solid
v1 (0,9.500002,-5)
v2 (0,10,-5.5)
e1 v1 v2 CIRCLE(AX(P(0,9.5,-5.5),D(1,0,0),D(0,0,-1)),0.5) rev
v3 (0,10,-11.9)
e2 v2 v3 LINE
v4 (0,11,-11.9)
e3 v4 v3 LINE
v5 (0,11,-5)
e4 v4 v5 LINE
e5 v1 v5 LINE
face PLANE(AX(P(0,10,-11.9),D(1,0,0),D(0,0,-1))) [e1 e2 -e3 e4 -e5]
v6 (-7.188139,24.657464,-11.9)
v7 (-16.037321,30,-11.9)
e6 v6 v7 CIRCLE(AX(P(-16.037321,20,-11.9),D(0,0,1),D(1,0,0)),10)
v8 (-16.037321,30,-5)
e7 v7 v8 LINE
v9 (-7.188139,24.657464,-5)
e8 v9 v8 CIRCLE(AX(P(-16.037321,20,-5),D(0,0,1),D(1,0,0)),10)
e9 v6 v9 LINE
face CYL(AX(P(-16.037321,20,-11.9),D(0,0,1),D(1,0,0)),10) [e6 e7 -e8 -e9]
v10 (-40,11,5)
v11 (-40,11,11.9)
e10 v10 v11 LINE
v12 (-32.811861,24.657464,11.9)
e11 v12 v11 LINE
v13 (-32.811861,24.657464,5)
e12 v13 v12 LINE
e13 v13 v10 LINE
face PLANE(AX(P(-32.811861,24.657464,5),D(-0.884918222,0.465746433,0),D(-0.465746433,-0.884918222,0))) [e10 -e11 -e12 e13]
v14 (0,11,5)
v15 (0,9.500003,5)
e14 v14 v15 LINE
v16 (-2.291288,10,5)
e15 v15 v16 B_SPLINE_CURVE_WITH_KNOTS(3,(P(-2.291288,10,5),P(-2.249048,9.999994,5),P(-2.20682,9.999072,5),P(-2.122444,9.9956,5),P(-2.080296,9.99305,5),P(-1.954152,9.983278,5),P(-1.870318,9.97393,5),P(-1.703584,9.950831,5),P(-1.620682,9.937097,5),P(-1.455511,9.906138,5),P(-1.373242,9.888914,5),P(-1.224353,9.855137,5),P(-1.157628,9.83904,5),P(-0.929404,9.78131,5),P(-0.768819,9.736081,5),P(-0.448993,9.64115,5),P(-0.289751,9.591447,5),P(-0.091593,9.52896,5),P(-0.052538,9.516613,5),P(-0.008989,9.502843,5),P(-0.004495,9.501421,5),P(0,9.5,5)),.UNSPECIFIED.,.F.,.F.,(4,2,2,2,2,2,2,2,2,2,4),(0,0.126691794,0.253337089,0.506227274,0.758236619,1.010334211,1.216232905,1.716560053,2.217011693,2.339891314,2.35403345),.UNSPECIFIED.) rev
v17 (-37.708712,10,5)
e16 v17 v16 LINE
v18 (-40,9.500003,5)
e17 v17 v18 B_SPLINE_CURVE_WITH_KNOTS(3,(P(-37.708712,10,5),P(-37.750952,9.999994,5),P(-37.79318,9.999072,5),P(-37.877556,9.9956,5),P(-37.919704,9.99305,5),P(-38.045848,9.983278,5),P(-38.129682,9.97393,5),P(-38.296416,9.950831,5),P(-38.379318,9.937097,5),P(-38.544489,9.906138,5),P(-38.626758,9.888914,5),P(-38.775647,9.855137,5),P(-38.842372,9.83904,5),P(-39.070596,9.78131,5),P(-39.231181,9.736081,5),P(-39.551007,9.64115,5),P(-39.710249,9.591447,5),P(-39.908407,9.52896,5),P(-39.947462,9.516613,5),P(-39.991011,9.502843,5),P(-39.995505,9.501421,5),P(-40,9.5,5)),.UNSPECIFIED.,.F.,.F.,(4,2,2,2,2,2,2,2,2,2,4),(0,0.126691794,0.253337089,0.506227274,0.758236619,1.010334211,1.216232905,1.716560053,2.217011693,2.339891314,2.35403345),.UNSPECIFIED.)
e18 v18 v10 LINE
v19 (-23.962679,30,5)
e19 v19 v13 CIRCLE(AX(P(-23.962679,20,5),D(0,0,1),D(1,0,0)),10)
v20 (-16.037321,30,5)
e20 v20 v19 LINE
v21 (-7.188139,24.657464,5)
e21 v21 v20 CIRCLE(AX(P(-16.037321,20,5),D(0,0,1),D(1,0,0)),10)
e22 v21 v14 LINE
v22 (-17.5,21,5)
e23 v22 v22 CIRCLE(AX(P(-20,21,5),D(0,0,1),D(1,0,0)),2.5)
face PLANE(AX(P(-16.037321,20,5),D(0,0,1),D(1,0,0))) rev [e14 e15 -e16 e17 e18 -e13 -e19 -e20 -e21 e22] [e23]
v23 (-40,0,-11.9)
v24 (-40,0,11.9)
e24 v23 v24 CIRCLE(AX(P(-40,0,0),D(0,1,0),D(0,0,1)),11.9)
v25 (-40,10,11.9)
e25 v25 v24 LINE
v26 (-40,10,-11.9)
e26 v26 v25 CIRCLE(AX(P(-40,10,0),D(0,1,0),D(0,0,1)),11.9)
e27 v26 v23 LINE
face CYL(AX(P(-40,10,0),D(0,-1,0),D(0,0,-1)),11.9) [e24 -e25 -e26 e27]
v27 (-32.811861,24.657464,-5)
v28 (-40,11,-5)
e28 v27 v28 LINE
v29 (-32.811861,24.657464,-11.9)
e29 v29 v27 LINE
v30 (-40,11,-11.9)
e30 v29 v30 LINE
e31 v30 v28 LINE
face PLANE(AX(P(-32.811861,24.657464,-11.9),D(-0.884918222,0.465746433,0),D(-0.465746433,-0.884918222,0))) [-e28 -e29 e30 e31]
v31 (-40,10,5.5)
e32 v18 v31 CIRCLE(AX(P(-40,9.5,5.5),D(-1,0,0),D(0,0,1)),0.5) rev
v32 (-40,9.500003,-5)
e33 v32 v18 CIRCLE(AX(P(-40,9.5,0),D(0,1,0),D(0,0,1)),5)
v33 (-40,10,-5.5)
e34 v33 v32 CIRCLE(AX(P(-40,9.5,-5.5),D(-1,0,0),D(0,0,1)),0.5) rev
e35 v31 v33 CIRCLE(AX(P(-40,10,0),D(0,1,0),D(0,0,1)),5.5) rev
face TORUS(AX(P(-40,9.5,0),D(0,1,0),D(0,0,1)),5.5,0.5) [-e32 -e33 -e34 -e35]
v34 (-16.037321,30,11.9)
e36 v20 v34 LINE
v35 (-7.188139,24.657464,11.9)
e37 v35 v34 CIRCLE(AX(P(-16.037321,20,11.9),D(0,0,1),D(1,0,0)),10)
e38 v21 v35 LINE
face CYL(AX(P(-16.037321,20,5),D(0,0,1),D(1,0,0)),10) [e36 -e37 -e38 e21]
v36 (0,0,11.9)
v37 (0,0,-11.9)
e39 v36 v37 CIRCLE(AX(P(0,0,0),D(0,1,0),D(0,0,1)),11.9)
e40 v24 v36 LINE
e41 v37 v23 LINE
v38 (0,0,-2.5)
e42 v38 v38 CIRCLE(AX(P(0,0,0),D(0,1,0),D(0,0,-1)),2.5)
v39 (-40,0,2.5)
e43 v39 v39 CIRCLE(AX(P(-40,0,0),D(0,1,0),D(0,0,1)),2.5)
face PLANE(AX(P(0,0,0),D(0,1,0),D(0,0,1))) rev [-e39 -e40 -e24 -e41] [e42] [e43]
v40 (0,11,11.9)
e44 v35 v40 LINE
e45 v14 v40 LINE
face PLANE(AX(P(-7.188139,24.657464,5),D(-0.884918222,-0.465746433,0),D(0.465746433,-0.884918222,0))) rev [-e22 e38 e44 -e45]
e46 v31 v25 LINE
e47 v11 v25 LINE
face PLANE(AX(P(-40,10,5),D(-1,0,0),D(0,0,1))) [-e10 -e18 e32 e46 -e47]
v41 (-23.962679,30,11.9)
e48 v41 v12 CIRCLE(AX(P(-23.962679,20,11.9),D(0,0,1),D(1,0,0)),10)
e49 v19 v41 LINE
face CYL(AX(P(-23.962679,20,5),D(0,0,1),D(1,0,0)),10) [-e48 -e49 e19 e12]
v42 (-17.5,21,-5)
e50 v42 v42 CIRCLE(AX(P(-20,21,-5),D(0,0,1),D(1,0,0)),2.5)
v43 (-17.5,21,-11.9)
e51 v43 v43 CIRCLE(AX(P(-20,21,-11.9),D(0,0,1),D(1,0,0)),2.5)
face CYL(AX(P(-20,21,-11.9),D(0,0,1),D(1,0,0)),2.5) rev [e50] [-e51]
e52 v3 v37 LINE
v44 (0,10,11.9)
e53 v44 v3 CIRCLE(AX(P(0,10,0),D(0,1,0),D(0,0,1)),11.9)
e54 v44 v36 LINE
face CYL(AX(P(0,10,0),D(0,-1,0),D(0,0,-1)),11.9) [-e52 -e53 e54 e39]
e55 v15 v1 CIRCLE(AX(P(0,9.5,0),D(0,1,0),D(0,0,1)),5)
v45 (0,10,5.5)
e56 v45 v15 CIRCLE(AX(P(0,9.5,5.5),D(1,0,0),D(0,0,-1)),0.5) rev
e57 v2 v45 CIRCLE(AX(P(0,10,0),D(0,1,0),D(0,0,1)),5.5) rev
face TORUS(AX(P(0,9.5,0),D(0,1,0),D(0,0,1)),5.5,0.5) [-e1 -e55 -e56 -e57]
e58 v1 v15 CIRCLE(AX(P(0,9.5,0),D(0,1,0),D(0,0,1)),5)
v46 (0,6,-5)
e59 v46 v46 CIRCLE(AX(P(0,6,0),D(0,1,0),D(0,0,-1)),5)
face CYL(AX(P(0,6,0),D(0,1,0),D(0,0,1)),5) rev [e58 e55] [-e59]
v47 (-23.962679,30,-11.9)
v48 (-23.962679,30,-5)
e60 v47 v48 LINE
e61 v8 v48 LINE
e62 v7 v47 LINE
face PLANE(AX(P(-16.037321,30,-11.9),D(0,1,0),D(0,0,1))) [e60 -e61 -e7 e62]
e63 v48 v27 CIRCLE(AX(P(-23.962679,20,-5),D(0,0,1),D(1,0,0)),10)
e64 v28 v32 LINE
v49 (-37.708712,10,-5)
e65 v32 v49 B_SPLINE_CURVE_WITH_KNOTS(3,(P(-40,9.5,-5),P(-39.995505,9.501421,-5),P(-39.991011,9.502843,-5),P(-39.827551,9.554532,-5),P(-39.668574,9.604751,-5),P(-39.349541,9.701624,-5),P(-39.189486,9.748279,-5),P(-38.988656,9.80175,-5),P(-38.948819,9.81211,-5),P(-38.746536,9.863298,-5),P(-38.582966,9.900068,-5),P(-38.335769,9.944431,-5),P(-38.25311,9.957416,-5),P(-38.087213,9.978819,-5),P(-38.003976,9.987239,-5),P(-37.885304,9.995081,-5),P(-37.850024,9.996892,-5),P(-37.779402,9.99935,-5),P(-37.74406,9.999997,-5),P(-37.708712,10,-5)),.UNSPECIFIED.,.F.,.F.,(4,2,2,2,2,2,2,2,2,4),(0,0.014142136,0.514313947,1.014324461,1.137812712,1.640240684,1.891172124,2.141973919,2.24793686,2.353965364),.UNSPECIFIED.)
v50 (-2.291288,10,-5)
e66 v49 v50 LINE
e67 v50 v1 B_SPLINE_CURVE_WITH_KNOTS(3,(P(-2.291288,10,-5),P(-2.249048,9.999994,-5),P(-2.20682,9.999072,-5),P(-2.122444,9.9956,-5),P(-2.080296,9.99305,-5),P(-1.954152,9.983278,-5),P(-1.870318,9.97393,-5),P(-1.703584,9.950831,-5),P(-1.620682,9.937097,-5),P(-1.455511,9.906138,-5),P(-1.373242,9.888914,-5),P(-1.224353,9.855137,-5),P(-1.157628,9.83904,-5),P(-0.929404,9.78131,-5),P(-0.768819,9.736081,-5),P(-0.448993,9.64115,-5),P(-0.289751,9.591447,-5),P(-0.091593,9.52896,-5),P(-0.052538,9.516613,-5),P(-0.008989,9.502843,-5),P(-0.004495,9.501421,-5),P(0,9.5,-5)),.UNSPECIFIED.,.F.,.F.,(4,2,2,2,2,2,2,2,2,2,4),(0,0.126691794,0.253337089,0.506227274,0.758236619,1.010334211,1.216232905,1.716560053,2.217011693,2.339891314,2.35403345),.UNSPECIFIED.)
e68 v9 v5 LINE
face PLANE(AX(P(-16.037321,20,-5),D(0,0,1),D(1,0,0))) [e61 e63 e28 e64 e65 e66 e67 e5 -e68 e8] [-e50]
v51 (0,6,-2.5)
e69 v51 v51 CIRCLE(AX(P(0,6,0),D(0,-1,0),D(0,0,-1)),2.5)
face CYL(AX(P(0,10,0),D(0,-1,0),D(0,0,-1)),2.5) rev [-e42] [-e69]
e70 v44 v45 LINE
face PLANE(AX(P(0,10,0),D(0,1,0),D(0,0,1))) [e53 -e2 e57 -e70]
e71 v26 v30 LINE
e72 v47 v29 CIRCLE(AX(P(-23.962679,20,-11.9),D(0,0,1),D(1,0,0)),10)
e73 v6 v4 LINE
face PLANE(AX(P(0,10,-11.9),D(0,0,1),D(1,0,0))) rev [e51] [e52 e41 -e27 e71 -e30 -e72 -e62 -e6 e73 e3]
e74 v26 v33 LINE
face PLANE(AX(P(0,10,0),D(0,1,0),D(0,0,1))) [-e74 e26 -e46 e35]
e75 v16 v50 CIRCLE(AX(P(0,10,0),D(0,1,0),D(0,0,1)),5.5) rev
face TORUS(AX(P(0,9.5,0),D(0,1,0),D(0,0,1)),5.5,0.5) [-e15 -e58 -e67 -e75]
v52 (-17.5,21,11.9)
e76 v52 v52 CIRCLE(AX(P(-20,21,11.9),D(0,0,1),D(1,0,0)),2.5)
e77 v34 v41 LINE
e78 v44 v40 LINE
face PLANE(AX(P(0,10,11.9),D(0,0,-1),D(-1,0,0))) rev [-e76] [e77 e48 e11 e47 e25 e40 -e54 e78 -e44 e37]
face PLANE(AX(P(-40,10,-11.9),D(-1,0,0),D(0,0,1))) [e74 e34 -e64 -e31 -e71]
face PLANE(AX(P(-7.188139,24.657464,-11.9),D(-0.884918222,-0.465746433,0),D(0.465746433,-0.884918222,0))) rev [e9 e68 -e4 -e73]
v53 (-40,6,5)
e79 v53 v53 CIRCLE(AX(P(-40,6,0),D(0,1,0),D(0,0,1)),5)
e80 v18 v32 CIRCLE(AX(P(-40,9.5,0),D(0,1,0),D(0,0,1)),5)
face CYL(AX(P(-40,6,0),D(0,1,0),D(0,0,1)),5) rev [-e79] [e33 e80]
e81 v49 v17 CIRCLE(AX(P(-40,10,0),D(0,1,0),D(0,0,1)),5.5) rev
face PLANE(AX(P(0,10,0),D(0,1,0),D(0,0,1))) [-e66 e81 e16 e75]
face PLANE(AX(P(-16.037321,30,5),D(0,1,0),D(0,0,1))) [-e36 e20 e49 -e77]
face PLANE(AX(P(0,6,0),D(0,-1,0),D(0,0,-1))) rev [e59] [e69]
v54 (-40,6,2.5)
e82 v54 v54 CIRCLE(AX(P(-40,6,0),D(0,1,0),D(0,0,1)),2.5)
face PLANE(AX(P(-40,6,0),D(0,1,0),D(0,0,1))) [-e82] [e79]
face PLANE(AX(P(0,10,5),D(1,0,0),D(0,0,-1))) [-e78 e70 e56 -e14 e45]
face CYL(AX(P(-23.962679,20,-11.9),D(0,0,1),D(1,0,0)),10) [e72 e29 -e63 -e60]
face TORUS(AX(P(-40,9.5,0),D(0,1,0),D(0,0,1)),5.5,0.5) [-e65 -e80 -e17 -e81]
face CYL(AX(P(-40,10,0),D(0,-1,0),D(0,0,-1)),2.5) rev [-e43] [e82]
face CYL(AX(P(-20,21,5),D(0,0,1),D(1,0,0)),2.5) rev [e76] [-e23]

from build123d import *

# Parameters (mm, degrees)
CROQUIS1_R              = 2.5
SALIENTE_EXTRUIR1_DEPTH = 10
CROQUIS3_R              = 2.5
SALIENTE_EXTRUIR2_DEPTH = 6.9
MATRIZL1_COUNT          = 2
MATRIZL1_PITCH          = 16.9
CROQUIS6_R              = 5
CORTAR_EXTRUIR1_DEPTH   = 4
REDONDEO3_R             = 0.5


with BuildPart() as part:
    # Croquis1 → Saliente-Extruir1 (new body)
    with BuildSketch(Plane(origin=(0, 0, 0), x_dir=(1, 0, 0), z_dir=(0, 1, 0))):
        with BuildLine():
            Line((0, -11.9), (-40, -11.9))
            ThreePointArc((-40, -11.9), (-51.9, 0), (-40, 11.9))
            Line((-40, 11.9), (0, 11.9))
            ThreePointArc((0, 11.9), (11.9, 0), (0, -11.9))
        make_face()
        with Locations(Location((-40, 0, 0), (0, 0, 270))):
            Circle(CROQUIS1_R, mode=Mode.SUBTRACT)
        with Locations(Location((0, 0, 0), (0, 0, 90))):
            Circle(CROQUIS1_R, mode=Mode.SUBTRACT)
    extrude(amount=SALIENTE_EXTRUIR1_DEPTH)

    # Croquis3 → Saliente-Extruir2 (add)
    with BuildSketch(Plane.XY.offset(11.9)):
        with BuildLine():
            Line((-40, 10), (-40, 11))
            Line((-40, 11), (-32.81186088, 24.657464328))
            ThreePointArc((-32.81186088, 24.657464328), (-29.131109594, 28.56080146), (-23.962678656, 30))
            Line((-23.962678656, 30), (-16.037321344, 30))
            ThreePointArc((-16.037321344, 30), (-10.868890406, 28.56080146), (-7.18813912, 24.657464328))
            Line((-7.18813912, 24.657464328), (0, 11))
            Line((0, 11), (0, 10))
            Line((0, 10), (0, 0))
            Line((0, 0), (-40, 0))
            Line((-40, 0), (-40, 10))
        make_face()
        with Locations((-20, 21)):
            Circle(CROQUIS3_R, mode=Mode.SUBTRACT)
    saliente_extruir2 = extrude(amount=-SALIENTE_EXTRUIR2_DEPTH)

    # MatrizL1: Saliente-Extruir2 ×2
    with Locations(*[(0, 0, -i * MATRIZL1_PITCH) for i in range(1, MATRIZL1_COUNT)]):
        add(saliente_extruir2)

    # Croquis6 → Cortar-Extruir1 (cut, symmetric)
    with BuildSketch(Plane(origin=(0, 10, 0), x_dir=(1, 0, 0), z_dir=(0, 1, 0))):
        with Locations(Location((-40, 0, 0), (0, 0, 270))):
            Circle(CROQUIS6_R)
        with Locations(Location((0, 0, 0), (0, 0, 90))):
            Circle(CROQUIS6_R)
    extrude(amount=CORTAR_EXTRUIR1_DEPTH, both=True, mode=Mode.SUBTRACT)

    # Redondeo3
    # the kernel refuses this fillet: 0.5 mm, written as the material it takes off along each edge
    with BuildSketch(Plane(origin=(-40, 10, 0), x_dir=(0, 0, -1), z_dir=(1, 0, 0))) as redondeo3_piece_1:
        with BuildLine():
            CenterArc((5 + REDONDEO3_R, -REDONDEO3_R), REDONDEO3_R, 90, 90)
            Line((5, -REDONDEO3_R), (5, 0))
            Line((5, 0), (5 + REDONDEO3_R, 0))
        make_face()
    revolve(axis=Axis((-40, 10, 0), (0, 1, 0)), revolution_arc=180, mode=Mode.SUBTRACT)
    with BuildSketch(Plane(origin=(-40, 10, 0), x_dir=(0, 0, 1), z_dir=(-1, 0, 0))) as redondeo3_piece_2_section:
        with BuildLine():
            CenterArc((5 + REDONDEO3_R, -REDONDEO3_R), REDONDEO3_R, 90, 90)
            Line((5 + REDONDEO3_R, 0), (5, 0))
            Line((5, 0), (5, -REDONDEO3_R))
        make_face()
    redondeo3_piece_2 = revolve(axis=Axis((-40, 10, 0), (0, 1, 0)), revolution_arc=180, mode=Mode.PRIVATE)
    redondeo3_piece_2 = split(redondeo3_piece_2, bisect_by=Plane(origin=(-34.859999019, 9.859999019, -5), z_dir=(0, 0, 1)), keep=Keep.TOP, mode=Mode.PRIVATE)
    redondeo3_piece_2 = split(redondeo3_piece_2, bisect_by=Plane(origin=(-34.859999019, 9.859999019, 5), z_dir=(0, 0, -1)), keep=Keep.TOP, mode=Mode.PRIVATE)
    add(redondeo3_piece_2, mode=Mode.SUBTRACT)
    with BuildSketch(Plane(origin=(0, 10, 0), x_dir=(0, 0, -1), z_dir=(1, 0, 0))) as redondeo3_piece_3_section:
        with BuildLine():
            CenterArc((5 + REDONDEO3_R, -REDONDEO3_R), REDONDEO3_R, 90, 90)
            Line((5, -REDONDEO3_R), (5, 0))
            Line((5, 0), (5 + REDONDEO3_R, 0))
        make_face()
    redondeo3_piece_3 = revolve(axis=Axis((0, 10, 0), (0, 1, 0)), revolution_arc=180, mode=Mode.PRIVATE)
    redondeo3_piece_3 = split(redondeo3_piece_3, bisect_by=Plane(origin=(-5.140000985, 9.859999015, -5), z_dir=(0, 0, 1)), keep=Keep.TOP, mode=Mode.PRIVATE)
    redondeo3_piece_3 = split(redondeo3_piece_3, bisect_by=Plane(origin=(-5.140000985, 9.859999015, 5), z_dir=(0, 0, -1)), keep=Keep.TOP, mode=Mode.PRIVATE)
    add(redondeo3_piece_3, mode=Mode.SUBTRACT)
    with BuildSketch(Plane(origin=(0, 10, 0), x_dir=(0, 0, 1), z_dir=(-1, 0, 0))) as redondeo3_piece_4:
        with BuildLine():
            CenterArc((5 + REDONDEO3_R, -REDONDEO3_R), REDONDEO3_R, 90, 90)
            Line((5, -REDONDEO3_R), (5, 0))
            Line((5, 0), (5 + REDONDEO3_R, 0))
        make_face()
    revolve(axis=Axis((0, 10, 0), (0, 1, 0)), revolution_arc=180, mode=Mode.SUBTRACT)


solid = part.part
